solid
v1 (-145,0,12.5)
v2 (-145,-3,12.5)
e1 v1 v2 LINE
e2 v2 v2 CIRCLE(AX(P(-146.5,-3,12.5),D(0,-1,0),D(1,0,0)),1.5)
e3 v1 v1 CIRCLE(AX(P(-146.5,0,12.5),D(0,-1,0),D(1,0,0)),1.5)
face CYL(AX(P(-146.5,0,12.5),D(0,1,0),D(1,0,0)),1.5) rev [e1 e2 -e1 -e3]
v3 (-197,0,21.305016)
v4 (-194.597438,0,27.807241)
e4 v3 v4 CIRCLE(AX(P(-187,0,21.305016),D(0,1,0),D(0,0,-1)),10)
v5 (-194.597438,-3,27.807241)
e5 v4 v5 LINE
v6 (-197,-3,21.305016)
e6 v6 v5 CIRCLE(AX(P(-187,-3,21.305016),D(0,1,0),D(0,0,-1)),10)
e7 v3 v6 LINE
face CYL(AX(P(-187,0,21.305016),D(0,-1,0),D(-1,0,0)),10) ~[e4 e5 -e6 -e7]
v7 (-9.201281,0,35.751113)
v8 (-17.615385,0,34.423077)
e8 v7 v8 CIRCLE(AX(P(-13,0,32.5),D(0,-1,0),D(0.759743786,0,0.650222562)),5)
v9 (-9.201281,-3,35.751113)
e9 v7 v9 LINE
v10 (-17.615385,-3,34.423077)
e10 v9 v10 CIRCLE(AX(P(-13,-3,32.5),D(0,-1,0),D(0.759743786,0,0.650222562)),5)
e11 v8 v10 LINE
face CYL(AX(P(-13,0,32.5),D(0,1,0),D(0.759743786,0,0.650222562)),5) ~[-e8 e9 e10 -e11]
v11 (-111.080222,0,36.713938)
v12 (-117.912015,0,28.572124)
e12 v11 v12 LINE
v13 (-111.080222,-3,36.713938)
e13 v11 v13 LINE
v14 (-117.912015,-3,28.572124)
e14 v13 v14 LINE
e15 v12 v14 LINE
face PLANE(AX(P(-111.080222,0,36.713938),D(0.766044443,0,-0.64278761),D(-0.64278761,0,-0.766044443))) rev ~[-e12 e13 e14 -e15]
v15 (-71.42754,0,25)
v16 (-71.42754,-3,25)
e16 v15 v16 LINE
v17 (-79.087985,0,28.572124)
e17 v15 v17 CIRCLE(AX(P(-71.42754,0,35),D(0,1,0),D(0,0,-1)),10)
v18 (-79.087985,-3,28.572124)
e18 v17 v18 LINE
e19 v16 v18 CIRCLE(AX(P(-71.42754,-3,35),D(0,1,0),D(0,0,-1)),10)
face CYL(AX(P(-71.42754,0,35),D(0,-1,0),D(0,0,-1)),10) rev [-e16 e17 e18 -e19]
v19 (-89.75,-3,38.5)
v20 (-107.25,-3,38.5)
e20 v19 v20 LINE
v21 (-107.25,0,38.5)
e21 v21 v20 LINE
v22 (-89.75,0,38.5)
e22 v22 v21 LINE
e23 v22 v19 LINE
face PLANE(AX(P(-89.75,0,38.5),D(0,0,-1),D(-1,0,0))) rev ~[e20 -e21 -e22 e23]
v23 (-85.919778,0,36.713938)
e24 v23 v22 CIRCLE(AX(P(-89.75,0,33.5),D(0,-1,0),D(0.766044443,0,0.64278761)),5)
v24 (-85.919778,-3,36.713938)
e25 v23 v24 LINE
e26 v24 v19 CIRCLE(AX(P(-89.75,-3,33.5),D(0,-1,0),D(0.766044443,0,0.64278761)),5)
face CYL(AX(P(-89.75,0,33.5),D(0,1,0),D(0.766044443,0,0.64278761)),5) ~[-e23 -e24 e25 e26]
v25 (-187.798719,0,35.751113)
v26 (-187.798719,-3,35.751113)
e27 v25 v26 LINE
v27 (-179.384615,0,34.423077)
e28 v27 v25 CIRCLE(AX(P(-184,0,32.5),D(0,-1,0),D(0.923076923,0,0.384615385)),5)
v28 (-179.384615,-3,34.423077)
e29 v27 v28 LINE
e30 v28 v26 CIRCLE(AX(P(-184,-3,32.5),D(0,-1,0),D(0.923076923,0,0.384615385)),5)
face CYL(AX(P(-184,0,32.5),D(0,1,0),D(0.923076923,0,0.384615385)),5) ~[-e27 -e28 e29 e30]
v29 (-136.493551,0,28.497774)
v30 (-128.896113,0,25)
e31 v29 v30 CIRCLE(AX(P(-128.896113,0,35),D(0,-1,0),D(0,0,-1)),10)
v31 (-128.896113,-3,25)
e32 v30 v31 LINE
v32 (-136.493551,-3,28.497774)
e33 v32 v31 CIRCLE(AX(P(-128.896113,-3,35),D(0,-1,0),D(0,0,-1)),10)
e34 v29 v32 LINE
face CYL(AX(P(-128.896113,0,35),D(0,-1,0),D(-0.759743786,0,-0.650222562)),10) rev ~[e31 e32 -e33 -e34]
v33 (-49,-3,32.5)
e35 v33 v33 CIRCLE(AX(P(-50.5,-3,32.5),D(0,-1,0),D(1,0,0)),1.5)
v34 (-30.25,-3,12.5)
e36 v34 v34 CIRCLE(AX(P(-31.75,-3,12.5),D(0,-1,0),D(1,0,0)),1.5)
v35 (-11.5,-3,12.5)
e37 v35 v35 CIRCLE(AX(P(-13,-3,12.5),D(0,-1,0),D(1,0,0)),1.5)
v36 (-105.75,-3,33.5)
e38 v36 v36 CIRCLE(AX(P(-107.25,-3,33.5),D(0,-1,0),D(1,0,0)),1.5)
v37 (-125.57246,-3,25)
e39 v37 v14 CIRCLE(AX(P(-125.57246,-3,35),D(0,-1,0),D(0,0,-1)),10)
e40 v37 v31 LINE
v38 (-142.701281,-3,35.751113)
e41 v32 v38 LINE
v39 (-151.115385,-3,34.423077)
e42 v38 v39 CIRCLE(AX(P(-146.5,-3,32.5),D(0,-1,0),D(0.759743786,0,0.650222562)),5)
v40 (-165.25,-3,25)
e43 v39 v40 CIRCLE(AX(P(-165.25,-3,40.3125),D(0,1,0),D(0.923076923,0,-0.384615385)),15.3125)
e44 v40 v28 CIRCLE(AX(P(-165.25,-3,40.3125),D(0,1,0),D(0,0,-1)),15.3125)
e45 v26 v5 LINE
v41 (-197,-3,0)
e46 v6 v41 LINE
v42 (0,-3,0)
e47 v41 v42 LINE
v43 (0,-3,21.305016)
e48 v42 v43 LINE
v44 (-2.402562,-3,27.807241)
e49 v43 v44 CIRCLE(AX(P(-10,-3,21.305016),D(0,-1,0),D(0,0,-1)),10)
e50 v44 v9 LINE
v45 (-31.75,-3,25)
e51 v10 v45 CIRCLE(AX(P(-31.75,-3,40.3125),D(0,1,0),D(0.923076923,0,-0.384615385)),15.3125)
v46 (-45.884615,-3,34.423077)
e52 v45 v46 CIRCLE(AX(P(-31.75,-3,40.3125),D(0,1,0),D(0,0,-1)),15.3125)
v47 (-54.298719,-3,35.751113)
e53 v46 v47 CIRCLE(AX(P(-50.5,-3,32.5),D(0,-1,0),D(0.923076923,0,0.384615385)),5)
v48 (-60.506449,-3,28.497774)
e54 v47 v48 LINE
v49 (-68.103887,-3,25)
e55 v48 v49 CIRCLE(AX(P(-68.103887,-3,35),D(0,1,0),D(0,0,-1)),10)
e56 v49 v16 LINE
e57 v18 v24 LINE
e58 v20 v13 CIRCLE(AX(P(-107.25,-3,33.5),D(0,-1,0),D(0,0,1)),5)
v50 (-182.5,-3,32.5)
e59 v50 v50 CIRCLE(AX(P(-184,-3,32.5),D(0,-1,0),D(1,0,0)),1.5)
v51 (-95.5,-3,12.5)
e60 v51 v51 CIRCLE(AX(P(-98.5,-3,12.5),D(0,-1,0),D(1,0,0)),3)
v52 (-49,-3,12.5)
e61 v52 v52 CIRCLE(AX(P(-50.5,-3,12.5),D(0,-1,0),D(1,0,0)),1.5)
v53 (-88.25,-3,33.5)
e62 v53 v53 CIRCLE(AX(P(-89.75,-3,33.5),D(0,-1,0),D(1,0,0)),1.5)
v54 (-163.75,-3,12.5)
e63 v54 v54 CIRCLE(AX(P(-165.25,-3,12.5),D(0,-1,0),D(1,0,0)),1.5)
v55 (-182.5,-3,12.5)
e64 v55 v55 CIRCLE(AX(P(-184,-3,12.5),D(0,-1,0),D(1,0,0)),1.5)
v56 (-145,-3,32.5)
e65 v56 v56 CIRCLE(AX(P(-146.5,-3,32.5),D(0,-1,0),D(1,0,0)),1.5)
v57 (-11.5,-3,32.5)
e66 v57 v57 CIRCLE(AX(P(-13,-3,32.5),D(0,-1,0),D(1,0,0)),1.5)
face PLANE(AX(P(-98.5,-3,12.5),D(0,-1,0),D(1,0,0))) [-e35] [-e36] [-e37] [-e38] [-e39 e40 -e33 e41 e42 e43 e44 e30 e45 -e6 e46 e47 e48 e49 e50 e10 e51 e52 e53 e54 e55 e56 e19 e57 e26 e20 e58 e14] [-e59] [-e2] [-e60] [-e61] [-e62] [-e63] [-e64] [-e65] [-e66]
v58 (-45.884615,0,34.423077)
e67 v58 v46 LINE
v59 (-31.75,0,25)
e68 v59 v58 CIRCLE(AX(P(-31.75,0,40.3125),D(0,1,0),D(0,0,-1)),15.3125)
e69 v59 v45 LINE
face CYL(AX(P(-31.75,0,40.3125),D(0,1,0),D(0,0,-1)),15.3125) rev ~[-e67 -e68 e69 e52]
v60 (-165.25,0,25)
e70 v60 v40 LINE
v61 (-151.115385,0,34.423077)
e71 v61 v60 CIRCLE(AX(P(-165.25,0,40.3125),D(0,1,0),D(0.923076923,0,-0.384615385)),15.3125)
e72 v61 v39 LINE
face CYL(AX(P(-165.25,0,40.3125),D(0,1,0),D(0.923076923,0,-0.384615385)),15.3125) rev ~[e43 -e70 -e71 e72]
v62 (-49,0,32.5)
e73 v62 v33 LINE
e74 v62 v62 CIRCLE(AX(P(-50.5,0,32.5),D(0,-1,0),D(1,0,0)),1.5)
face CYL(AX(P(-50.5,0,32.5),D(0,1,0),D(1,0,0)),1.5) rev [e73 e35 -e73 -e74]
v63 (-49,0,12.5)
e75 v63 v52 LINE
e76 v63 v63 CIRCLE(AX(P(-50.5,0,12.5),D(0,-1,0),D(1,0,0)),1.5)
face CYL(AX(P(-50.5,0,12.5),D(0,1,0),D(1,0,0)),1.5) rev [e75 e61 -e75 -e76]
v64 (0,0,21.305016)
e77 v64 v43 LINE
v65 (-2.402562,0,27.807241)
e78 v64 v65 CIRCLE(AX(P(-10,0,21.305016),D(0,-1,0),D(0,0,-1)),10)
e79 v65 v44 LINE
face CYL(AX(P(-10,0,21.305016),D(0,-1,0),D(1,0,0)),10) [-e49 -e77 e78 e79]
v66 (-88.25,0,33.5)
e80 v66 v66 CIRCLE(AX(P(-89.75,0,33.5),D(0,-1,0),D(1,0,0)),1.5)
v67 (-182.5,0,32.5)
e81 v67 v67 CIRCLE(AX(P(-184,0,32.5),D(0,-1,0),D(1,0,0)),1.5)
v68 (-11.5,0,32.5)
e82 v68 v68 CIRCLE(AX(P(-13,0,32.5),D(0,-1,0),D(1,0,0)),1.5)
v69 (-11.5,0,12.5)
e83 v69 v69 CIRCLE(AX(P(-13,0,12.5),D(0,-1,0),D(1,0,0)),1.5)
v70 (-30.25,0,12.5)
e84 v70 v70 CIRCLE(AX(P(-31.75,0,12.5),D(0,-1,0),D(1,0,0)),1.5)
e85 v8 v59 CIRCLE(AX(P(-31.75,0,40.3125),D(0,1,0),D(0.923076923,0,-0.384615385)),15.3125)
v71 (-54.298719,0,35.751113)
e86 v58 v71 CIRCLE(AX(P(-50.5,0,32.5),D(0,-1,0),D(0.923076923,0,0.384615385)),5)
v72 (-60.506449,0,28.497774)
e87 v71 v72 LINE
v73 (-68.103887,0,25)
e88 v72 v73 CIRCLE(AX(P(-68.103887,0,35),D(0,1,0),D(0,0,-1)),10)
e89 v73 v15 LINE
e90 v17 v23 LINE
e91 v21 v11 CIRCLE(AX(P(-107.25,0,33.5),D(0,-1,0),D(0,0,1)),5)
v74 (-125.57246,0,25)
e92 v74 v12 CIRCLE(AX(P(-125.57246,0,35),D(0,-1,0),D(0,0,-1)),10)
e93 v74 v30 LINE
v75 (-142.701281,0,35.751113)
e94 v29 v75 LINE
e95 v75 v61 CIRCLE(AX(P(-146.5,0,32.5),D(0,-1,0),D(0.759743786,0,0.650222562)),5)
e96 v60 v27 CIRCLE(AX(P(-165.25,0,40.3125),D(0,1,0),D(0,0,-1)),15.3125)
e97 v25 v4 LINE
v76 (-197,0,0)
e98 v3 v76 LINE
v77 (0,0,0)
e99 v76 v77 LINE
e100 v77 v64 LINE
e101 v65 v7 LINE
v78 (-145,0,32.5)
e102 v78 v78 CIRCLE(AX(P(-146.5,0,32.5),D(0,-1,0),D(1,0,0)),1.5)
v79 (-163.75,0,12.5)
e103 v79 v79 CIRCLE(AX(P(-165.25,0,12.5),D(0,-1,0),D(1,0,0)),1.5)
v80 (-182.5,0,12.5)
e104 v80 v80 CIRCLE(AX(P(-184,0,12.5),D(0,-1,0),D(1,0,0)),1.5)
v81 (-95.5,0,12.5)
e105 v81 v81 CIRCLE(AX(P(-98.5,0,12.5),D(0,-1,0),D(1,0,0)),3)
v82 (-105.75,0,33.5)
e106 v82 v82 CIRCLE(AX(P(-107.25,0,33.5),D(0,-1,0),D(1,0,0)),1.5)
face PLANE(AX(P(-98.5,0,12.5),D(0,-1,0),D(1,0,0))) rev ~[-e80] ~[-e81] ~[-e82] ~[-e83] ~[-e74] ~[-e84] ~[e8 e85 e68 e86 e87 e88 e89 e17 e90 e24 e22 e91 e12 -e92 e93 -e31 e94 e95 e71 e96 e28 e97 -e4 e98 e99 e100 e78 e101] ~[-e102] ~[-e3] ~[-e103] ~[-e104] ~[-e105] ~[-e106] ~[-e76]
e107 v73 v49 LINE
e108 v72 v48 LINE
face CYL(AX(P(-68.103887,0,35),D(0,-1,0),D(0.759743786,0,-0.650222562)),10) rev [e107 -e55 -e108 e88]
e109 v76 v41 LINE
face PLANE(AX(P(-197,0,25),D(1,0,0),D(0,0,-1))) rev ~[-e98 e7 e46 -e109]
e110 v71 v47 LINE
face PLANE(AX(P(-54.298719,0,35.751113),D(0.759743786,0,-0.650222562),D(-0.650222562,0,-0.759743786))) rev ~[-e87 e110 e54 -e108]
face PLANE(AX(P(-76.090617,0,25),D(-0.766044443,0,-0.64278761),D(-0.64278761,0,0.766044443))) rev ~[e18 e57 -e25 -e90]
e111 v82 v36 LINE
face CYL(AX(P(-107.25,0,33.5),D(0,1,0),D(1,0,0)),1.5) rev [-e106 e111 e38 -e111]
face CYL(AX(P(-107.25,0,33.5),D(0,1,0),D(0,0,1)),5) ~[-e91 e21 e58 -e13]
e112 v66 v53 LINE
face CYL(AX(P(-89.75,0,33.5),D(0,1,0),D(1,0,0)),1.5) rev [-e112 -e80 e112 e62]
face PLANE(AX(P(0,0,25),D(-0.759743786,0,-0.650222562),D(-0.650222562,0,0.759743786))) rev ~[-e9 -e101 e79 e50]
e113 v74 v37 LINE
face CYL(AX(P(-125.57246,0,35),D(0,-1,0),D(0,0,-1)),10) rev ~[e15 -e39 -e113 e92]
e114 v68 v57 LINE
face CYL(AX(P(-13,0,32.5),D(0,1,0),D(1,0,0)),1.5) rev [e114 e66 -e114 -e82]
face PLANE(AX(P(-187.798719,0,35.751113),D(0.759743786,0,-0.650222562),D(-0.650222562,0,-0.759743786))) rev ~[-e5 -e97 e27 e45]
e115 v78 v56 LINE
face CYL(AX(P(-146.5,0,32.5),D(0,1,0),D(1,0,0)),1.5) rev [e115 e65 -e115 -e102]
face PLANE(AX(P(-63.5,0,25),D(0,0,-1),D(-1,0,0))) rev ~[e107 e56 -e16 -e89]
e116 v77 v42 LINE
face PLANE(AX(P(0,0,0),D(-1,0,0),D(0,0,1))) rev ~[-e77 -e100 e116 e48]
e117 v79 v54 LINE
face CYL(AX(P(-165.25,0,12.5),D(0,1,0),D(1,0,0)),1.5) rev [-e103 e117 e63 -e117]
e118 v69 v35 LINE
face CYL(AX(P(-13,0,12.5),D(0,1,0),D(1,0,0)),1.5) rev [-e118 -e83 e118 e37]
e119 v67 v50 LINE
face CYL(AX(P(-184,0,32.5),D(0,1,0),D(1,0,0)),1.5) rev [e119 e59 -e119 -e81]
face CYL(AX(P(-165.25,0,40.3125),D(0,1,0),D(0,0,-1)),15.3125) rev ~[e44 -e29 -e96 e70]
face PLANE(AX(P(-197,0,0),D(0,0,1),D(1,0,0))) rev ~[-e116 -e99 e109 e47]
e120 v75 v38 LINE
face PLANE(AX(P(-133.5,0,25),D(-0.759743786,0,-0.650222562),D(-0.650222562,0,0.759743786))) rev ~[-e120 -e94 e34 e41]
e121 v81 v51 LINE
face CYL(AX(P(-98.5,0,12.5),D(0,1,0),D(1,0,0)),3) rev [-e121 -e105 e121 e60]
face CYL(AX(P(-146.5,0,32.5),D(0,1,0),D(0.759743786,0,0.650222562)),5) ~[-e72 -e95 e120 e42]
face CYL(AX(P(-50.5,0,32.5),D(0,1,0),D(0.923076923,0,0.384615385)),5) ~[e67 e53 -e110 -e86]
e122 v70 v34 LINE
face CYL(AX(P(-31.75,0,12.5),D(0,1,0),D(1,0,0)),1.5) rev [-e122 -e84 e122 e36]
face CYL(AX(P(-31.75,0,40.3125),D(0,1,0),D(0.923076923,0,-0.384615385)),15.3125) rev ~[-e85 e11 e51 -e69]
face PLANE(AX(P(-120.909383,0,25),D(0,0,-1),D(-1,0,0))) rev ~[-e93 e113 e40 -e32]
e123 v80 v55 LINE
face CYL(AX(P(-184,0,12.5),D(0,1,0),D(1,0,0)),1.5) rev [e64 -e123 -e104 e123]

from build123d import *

# Parameters (mm, degrees)
F0_R     = 1.5
F0_R_2   = 3
F1_DEPTH = 3
F2_R     = 10


# Not quite as in the source:
# - a feature names something its author has since deleted; it is built from what else it names


with BuildPart() as f1:
    # F0 (on Front) → F1 (new body)
    with BuildSketch(Plane.XZ):
        Polygon((-197, 0), (0, 0), (0, 25), (-31.75, 25), (-63.5, 25), (-76.0906166883, 25), (-120.9093833117, 25), (-133.5, 25), (-165.25, 25), (-197, 25), align=None)
        with Locations((-184, 12.5)):
            Circle(F0_R, mode=Mode.SUBTRACT)
        with Locations((-165.25, 12.5)):
            Circle(F0_R, mode=Mode.SUBTRACT)
        with Locations((-146.5, 12.5)):
            Circle(F0_R, mode=Mode.SUBTRACT)
        with Locations((-98.5, 12.5)):
            Circle(F0_R_2, mode=Mode.SUBTRACT)
        with Locations((-50.5, 12.5)):
            Circle(F0_R, mode=Mode.SUBTRACT)
        with Locations((-31.75, 12.5)):
            Circle(F0_R, mode=Mode.SUBTRACT)
        with Locations((-13, 12.5)):
            Circle(F0_R, mode=Mode.SUBTRACT)
        with BuildLine():
            Line((-63.5, 25), (-31.75, 25))
            ThreePointArc((-31.75, 25), (-40.2438467547, 27.571729868), (-45.8846153846, 34.4230769231))
            ThreePointArc((-45.8846153846, 34.4230769231), (-49.720477364, 37.4388606439), (-54.2987189286, 35.7511128097))
            Line((-54.2987189286, 35.7511128097), (-63.5, 25))
        make_face()
        with Locations((-50.5, 32.5)):
            Circle(F0_R, mode=Mode.SUBTRACT)
        with BuildLine():
            Line((-31.75, 25), (0, 25))
            Line((0, 25), (-9.2012810714, 35.7511128097))
            ThreePointArc((-9.2012810714, 35.7511128097), (-13.779522636, 37.4388606439), (-17.6153846154, 34.4230769231))
            ThreePointArc((-17.6153846154, 34.4230769231), (-23.2561532453, 27.571729868), (-31.75, 25))
        make_face()
        with Locations((-13, 32.5)):
            Circle(F0_R, mode=Mode.SUBTRACT)
        with BuildLine():
            Line((-187.7987189286, 35.7511128097), (-197, 25))
            Line((-197, 25), (-165.25, 25))
            ThreePointArc((-165.25, 25), (-173.7438467547, 27.571729868), (-179.3846153846, 34.4230769231))
            ThreePointArc((-179.3846153846, 34.4230769231), (-183.220477364, 37.4388606439), (-187.7987189286, 35.7511128097))
        make_face()
        with Locations((-184, 32.5)):
            Circle(F0_R, mode=Mode.SUBTRACT)
        with BuildLine():
            ThreePointArc((-151.1153846154, 34.4230769231), (-156.7561532453, 27.571729868), (-165.25, 25))
            Line((-165.25, 25), (-133.5, 25))
            Line((-133.5, 25), (-142.7012810714, 35.7511128097))
            ThreePointArc((-142.7012810714, 35.7511128097), (-147.279522636, 37.4388606439), (-151.1153846154, 34.4230769231))
        make_face()
        with Locations((-146.5, 32.5)):
            Circle(F0_R, mode=Mode.SUBTRACT)
        with BuildLine():
            Line((-120.9093833117, 25), (-76.0906166883, 25))
            Line((-76.0906166883, 25), (-85.9197777844, 36.7139380484))
            ThreePointArc((-85.9197777844, 36.7139380484), (-87.6369086913, 38.0315389352), (-89.75, 38.5))
            Line((-89.75, 38.5), (-107.25, 38.5))
            ThreePointArc((-107.25, 38.5), (-109.3630913087, 38.0315389352), (-111.0802222156, 36.7139380484))
            Line((-111.0802222156, 36.7139380484), (-120.9093833117, 25))
        make_face()
        with Locations((-107.25, 33.5)):
            Circle(F0_R, mode=Mode.SUBTRACT)
        with Locations((-89.75, 33.5)):
            Circle(F0_R, mode=Mode.SUBTRACT)
    extrude(amount=F1_DEPTH)

    # F2
    f2_edges = [f1.edges().sort_by_distance(p)[0] for p in [
        (0, -1.5, 25),
        (-197, -1.5, 25),
        (-133.5, -1.5, 25),
        (-63.5, -1.5, 25),
        (-120.909383, -1.5, 25),
        (-76.090617, -1.5, 25),
    ]]
    fillet(f2_edges, radius=F2_R)


solid = f1.part
